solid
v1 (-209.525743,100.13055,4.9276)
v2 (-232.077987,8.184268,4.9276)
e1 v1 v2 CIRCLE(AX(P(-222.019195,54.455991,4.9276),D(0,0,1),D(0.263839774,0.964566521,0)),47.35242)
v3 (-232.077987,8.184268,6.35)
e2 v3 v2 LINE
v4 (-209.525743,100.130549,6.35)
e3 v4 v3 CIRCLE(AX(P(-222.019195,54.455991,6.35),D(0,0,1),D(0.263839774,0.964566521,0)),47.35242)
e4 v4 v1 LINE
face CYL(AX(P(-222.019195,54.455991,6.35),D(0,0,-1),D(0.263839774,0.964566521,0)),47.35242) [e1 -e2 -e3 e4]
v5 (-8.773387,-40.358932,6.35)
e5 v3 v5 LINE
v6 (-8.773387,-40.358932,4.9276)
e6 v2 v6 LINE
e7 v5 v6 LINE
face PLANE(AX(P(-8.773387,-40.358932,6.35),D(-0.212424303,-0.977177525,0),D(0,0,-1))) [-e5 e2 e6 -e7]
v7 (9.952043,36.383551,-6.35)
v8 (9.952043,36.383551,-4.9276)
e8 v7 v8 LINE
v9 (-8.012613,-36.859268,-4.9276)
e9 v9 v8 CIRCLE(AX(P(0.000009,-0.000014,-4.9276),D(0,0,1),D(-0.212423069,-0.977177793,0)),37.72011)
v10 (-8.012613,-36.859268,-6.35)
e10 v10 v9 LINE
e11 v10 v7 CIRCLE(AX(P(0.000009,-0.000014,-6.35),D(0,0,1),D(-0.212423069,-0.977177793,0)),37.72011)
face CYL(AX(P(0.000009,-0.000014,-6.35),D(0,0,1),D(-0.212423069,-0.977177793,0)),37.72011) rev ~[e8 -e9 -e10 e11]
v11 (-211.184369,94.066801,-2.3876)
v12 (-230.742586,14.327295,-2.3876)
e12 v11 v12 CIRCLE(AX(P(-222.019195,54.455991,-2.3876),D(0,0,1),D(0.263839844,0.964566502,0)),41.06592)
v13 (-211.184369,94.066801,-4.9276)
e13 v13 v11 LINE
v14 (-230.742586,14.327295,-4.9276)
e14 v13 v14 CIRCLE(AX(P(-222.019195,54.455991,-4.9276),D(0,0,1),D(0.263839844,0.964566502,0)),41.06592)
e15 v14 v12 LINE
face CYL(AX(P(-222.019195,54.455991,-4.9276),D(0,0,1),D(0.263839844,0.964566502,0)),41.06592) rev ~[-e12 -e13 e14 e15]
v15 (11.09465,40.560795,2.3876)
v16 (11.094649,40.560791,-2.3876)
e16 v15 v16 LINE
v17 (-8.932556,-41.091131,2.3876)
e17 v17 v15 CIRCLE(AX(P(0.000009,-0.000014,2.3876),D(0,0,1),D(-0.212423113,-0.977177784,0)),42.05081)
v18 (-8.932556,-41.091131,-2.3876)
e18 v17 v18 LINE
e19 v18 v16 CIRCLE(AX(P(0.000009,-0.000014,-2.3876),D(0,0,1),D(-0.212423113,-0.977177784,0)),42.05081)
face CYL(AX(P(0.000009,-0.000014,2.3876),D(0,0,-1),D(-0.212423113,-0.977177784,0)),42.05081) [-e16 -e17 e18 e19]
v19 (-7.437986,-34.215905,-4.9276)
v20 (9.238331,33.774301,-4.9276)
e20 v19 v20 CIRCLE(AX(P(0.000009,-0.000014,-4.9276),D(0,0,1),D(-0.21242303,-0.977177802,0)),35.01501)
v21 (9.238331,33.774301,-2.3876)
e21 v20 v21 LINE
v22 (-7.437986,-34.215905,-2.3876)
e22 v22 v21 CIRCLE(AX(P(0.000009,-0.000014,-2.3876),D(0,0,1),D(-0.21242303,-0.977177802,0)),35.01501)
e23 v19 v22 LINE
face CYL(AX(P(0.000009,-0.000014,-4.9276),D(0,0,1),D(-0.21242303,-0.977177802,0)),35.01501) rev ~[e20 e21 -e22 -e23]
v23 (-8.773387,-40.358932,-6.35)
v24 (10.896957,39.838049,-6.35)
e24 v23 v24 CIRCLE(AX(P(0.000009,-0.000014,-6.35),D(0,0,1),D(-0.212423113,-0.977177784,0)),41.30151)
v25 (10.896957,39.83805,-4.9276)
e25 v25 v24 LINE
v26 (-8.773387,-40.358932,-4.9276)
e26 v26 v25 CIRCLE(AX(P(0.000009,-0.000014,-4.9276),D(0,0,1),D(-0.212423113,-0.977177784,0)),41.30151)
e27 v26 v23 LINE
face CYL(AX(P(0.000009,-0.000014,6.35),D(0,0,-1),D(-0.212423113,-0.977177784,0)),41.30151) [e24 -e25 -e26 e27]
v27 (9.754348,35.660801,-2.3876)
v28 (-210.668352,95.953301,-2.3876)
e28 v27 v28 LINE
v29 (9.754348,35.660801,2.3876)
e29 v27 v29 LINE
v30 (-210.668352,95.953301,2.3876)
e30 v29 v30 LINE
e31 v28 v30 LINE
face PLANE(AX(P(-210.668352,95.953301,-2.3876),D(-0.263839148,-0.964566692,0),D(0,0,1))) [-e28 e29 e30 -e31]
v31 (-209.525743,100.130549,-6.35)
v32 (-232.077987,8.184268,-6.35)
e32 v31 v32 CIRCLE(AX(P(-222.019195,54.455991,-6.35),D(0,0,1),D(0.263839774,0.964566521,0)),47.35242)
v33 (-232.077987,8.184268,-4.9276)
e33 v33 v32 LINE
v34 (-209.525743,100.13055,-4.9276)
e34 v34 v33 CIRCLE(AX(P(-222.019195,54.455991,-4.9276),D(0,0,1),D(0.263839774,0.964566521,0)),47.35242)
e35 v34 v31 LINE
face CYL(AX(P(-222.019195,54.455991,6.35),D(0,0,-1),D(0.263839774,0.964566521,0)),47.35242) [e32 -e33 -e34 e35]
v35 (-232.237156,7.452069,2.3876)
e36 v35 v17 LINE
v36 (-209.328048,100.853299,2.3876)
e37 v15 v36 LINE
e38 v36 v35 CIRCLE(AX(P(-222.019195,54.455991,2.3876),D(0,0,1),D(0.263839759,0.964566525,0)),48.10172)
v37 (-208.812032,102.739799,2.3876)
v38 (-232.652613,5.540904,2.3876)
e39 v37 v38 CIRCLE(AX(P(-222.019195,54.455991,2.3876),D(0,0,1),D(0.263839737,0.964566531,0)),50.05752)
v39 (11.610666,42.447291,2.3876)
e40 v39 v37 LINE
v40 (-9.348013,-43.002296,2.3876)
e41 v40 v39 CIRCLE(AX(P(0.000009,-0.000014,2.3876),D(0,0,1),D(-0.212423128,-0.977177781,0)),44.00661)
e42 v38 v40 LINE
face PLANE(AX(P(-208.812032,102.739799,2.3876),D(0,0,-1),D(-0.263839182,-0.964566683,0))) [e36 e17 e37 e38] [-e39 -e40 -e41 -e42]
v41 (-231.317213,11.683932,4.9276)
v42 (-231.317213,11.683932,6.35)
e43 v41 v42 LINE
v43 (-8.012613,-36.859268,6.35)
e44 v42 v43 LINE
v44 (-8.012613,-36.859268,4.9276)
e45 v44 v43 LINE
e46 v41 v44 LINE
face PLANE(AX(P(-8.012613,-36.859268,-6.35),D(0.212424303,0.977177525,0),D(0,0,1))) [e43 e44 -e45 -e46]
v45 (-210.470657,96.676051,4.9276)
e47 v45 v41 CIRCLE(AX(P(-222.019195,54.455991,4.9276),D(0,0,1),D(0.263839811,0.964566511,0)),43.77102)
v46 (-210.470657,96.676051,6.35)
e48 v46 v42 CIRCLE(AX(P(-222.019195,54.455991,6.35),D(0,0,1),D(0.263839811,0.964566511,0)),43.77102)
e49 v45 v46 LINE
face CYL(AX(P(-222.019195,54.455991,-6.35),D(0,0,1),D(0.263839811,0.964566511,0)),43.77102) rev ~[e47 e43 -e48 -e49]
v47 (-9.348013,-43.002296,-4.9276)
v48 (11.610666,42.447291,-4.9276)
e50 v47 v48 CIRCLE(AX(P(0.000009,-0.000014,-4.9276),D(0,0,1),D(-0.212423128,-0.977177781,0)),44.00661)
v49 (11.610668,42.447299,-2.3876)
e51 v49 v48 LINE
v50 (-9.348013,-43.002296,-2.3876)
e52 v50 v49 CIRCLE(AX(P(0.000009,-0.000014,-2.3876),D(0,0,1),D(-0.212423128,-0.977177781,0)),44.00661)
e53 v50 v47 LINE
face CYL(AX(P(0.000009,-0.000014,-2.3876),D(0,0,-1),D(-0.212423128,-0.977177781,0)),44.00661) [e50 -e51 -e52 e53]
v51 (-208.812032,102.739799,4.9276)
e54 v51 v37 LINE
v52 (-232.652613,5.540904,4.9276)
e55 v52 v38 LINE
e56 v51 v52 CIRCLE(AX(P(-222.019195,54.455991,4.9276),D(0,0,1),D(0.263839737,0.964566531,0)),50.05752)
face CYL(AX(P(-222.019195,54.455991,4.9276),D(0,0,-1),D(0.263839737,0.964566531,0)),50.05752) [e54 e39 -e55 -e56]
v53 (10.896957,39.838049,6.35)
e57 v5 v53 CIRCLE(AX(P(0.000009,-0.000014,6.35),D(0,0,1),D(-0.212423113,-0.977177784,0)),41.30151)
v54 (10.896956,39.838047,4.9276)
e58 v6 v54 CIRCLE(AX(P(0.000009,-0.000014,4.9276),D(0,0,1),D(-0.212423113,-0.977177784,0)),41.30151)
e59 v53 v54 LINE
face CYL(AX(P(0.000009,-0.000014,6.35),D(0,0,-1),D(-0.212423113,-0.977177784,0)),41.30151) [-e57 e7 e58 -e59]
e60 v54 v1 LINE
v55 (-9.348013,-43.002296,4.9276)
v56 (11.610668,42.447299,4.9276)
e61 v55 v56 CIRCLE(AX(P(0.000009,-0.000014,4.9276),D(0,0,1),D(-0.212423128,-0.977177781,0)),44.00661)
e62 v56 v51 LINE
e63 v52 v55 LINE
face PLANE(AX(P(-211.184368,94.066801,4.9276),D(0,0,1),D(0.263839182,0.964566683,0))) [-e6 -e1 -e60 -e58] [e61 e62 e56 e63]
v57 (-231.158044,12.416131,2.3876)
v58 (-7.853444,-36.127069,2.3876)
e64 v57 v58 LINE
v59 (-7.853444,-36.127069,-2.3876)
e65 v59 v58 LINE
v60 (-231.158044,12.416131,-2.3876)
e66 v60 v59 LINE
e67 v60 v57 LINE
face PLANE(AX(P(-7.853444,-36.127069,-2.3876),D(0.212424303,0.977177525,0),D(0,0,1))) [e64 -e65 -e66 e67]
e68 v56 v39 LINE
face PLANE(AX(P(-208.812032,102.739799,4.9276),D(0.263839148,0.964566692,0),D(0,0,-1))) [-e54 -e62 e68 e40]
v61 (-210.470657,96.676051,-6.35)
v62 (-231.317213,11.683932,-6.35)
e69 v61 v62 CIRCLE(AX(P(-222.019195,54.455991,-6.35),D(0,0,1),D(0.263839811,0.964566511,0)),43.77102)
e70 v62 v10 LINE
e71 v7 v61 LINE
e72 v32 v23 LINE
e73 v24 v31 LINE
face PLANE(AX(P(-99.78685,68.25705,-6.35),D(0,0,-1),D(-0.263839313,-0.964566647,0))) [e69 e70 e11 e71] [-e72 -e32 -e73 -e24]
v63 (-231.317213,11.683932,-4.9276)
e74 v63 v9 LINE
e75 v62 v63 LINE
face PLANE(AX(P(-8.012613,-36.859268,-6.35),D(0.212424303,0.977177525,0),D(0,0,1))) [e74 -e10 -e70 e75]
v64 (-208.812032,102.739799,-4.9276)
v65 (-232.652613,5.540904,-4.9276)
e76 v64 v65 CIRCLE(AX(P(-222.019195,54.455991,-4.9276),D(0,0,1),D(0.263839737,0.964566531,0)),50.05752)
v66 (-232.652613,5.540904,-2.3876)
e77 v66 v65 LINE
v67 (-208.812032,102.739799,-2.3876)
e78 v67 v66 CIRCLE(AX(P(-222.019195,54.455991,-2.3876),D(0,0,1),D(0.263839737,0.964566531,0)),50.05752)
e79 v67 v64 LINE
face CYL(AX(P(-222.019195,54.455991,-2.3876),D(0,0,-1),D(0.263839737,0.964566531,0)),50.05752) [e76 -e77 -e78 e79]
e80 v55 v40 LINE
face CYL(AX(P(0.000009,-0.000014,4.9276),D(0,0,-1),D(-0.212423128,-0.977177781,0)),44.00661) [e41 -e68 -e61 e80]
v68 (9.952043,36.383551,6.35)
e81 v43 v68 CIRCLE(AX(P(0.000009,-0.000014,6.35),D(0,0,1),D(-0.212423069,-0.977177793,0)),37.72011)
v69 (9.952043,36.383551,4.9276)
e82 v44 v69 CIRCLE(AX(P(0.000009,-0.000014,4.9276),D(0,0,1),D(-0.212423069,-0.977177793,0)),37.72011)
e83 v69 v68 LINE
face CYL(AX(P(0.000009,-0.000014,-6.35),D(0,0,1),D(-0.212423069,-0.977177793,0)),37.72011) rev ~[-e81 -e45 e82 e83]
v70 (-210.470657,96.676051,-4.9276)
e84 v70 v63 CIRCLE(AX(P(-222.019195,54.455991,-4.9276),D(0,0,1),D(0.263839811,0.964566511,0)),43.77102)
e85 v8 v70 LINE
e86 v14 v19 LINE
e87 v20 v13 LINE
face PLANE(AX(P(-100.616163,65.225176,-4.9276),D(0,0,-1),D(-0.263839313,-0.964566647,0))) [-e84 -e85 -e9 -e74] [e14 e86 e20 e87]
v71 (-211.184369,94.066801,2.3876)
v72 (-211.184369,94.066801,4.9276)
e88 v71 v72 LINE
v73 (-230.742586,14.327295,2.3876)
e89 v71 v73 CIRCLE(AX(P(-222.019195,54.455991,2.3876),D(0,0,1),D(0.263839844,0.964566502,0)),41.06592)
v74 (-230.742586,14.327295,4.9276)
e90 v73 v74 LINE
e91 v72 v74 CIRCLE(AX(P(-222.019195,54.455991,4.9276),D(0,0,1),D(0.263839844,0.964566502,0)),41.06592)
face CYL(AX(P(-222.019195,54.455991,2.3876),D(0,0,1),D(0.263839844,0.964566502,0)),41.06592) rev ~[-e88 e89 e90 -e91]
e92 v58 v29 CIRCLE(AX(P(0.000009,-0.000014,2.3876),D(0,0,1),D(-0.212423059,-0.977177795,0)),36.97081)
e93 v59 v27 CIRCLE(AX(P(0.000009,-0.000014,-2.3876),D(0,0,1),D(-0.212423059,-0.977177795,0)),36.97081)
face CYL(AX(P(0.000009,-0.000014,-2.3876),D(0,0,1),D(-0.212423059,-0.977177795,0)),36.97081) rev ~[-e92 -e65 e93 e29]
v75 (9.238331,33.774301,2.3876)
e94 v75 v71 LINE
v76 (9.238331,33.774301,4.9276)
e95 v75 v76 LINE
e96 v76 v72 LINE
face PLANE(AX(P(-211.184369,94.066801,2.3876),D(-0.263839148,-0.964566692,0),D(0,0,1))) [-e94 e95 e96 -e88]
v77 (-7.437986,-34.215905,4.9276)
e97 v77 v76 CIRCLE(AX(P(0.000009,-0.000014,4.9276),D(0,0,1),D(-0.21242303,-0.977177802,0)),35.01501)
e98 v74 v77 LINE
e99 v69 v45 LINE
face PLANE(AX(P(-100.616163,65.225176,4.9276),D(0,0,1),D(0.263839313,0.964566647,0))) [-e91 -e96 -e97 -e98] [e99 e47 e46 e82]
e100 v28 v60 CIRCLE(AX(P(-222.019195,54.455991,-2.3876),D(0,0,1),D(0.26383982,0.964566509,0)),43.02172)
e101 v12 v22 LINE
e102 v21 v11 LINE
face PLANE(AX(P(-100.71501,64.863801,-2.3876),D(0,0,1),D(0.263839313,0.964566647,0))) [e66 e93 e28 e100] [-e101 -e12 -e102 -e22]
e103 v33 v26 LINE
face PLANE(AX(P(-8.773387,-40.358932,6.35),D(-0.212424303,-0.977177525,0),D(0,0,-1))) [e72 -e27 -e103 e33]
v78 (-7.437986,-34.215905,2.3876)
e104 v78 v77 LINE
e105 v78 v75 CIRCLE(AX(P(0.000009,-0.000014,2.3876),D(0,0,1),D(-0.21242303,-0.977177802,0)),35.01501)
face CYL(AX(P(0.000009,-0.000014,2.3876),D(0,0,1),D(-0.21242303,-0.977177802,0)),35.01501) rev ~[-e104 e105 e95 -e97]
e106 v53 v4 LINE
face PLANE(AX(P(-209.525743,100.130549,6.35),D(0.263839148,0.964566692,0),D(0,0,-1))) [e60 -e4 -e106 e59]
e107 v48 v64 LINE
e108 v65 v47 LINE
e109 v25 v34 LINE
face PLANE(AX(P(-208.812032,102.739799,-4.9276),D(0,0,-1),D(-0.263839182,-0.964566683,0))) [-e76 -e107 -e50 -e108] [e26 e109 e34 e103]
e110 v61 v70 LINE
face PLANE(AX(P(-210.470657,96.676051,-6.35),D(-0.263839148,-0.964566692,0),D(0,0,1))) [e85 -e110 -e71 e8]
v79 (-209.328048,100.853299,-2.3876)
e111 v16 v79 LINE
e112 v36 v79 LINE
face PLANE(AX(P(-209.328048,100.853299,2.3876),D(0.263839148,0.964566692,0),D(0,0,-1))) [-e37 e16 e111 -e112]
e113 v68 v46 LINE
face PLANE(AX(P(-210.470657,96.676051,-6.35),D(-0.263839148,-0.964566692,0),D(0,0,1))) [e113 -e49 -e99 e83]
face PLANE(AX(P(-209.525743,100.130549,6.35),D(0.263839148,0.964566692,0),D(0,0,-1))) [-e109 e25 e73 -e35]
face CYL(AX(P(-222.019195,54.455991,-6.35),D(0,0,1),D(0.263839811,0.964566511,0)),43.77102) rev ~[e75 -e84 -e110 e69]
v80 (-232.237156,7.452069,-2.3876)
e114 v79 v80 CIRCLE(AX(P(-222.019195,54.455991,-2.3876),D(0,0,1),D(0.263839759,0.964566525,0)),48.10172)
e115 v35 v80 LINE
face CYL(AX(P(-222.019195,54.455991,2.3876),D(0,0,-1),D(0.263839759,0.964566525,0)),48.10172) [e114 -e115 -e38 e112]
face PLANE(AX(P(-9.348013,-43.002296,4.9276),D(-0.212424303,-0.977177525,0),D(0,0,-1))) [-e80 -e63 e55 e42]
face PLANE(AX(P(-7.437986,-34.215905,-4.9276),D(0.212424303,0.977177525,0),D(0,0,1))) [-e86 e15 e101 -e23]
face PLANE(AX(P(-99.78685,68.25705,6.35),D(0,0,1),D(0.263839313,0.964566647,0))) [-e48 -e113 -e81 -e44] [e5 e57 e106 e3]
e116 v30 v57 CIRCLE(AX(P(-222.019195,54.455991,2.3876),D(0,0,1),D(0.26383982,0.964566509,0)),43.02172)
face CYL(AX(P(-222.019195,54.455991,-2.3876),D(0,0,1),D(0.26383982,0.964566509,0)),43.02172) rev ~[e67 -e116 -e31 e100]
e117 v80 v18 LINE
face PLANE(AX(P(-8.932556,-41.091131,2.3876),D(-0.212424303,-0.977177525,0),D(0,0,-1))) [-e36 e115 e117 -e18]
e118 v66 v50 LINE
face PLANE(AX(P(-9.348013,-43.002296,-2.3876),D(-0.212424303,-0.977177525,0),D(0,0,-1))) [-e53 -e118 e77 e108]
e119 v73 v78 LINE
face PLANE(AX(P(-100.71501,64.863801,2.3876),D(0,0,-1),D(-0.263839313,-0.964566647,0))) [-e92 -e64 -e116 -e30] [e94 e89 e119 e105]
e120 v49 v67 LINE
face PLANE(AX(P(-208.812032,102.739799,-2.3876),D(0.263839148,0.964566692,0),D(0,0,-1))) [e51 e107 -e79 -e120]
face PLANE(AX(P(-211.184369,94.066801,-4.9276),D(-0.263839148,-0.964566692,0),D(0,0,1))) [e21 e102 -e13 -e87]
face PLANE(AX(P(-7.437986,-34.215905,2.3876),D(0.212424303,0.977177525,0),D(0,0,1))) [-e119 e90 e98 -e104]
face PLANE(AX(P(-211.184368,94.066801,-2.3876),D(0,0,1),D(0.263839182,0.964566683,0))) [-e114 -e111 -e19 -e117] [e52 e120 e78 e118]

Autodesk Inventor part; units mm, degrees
ref_plane "Work Plane2" through (0, 0, 0) normal (-1, 0, 0) x (0, 0, 1)
ref_plane "Work Plane3" through (-222.0192, 54.456, 0) normal (0.9714042, -0.2374316, 0) x (0, 0, 1)
sketch "Path" plane through (0, 0, 0) normal (0, 0, 1) x (1, 0, 0)
  arc A0 (-8.393, -38.6091) -> (10.4245, 38.1108) centre (0, 0) ccw
  arc A1 (-209.9982, 98.4033) -> (-231.6976, 9.9341) centre (-222.0192, 54.456) ccw
  line L0 (-209.9982, 98.4033) -> (10.4245, 38.1108)
  line L1 (-8.393, -38.6091) -> (-231.6976, 9.9341)
  dimension "d31" = 8.9916
ref_plane "Section Plane" through (10.4245, 38.1108, 0) normal (-0.9645666, 0.2638393, 0) x (0, 0, 1)
sketch "Section Sketch" plane through (10.4245, 38.1108, 0) normal (-0.9645666, 0.2638393, 0) x (0, 0, 1)
  line L0 (-6.35, -1.7907) -> (6.35, -1.7907)
  line L1 (6.35, -1.7907) -> (6.35, 1.7907)
  line L2 (6.35, 1.7907) -> (-6.35, 1.7907)
  line L3 (-6.35, 1.7907) -> (-6.35, -1.7907)
  line L4 (-2.3876, -2.54) -> (2.3876, -2.54)
  line L5 (2.3876, -2.54) -> (2.3876, 2.54)
  line L6 (2.3876, 2.54) -> (-2.3876, 2.54)
  line L7 (-2.3876, 2.54) -> (-2.3876, -2.54)
  line L8 (-2.3876, 0) -> (2.3876, 0) construction
  line L9 (-4.9276, -4.4958) -> (-2.3876, -4.4958)
  line L10 (-2.3876, -4.4958) -> (-2.3876, 4.4958)
  line L11 (-2.3876, 4.4958) -> (-4.9276, 4.4958)
  line L12 (-4.9276, 4.4958) -> (-4.9276, -4.4958)
  line L13 (2.3876, -4.4958) -> (4.9276, -4.4958)
  line L14 (4.9276, -4.4958) -> (4.9276, 4.4958)
  line L15 (4.9276, 4.4958) -> (2.3876, 4.4958)
  line L16 (2.3876, 4.4958) -> (2.3876, -4.4958)
  line L17 (-6.35, 0) -> (6.35, 0) construction
  point P0 (0, 0)
  point P1 (0, 0)
  dimension "d21" = 3.5814
  dimension "d22" = 5.08
  dimension "d23" = 4.7752
  dimension "d24" = 2.54
  dimension "d31" = 8.9916
  dimension "d32" = 12.7
sweep "Solid" add profiles "Section Sketch" path "Path"
pattern_of_one "Strand Pattern"
equation "\"d21\" = da_d2"
equation "\"d22\" = da_d1"
equation "\"d23\" = da_b1"
equation "\"d24\" = da_t1 + da_t2"
equation "\"d30\" = da_pt"
equation "\"da_p\" = 9.525"
equation "\"da_b1\" = 4.7752"
equation "\"da_h2\" = 8.9916"
equation "\"da_h3\" = 7.7978"
equation "\"da_d1\" = 5.08"
equation "\"da_d2\" = 3.5814"
equation "\"da_pt\" = 10.1346"
equation "\"da_b\" = 12.7"
equation "\"da_t1\" = 1.27"
equation "\"da_t2\" = 1.27"
properties part number "Roller Chain"
